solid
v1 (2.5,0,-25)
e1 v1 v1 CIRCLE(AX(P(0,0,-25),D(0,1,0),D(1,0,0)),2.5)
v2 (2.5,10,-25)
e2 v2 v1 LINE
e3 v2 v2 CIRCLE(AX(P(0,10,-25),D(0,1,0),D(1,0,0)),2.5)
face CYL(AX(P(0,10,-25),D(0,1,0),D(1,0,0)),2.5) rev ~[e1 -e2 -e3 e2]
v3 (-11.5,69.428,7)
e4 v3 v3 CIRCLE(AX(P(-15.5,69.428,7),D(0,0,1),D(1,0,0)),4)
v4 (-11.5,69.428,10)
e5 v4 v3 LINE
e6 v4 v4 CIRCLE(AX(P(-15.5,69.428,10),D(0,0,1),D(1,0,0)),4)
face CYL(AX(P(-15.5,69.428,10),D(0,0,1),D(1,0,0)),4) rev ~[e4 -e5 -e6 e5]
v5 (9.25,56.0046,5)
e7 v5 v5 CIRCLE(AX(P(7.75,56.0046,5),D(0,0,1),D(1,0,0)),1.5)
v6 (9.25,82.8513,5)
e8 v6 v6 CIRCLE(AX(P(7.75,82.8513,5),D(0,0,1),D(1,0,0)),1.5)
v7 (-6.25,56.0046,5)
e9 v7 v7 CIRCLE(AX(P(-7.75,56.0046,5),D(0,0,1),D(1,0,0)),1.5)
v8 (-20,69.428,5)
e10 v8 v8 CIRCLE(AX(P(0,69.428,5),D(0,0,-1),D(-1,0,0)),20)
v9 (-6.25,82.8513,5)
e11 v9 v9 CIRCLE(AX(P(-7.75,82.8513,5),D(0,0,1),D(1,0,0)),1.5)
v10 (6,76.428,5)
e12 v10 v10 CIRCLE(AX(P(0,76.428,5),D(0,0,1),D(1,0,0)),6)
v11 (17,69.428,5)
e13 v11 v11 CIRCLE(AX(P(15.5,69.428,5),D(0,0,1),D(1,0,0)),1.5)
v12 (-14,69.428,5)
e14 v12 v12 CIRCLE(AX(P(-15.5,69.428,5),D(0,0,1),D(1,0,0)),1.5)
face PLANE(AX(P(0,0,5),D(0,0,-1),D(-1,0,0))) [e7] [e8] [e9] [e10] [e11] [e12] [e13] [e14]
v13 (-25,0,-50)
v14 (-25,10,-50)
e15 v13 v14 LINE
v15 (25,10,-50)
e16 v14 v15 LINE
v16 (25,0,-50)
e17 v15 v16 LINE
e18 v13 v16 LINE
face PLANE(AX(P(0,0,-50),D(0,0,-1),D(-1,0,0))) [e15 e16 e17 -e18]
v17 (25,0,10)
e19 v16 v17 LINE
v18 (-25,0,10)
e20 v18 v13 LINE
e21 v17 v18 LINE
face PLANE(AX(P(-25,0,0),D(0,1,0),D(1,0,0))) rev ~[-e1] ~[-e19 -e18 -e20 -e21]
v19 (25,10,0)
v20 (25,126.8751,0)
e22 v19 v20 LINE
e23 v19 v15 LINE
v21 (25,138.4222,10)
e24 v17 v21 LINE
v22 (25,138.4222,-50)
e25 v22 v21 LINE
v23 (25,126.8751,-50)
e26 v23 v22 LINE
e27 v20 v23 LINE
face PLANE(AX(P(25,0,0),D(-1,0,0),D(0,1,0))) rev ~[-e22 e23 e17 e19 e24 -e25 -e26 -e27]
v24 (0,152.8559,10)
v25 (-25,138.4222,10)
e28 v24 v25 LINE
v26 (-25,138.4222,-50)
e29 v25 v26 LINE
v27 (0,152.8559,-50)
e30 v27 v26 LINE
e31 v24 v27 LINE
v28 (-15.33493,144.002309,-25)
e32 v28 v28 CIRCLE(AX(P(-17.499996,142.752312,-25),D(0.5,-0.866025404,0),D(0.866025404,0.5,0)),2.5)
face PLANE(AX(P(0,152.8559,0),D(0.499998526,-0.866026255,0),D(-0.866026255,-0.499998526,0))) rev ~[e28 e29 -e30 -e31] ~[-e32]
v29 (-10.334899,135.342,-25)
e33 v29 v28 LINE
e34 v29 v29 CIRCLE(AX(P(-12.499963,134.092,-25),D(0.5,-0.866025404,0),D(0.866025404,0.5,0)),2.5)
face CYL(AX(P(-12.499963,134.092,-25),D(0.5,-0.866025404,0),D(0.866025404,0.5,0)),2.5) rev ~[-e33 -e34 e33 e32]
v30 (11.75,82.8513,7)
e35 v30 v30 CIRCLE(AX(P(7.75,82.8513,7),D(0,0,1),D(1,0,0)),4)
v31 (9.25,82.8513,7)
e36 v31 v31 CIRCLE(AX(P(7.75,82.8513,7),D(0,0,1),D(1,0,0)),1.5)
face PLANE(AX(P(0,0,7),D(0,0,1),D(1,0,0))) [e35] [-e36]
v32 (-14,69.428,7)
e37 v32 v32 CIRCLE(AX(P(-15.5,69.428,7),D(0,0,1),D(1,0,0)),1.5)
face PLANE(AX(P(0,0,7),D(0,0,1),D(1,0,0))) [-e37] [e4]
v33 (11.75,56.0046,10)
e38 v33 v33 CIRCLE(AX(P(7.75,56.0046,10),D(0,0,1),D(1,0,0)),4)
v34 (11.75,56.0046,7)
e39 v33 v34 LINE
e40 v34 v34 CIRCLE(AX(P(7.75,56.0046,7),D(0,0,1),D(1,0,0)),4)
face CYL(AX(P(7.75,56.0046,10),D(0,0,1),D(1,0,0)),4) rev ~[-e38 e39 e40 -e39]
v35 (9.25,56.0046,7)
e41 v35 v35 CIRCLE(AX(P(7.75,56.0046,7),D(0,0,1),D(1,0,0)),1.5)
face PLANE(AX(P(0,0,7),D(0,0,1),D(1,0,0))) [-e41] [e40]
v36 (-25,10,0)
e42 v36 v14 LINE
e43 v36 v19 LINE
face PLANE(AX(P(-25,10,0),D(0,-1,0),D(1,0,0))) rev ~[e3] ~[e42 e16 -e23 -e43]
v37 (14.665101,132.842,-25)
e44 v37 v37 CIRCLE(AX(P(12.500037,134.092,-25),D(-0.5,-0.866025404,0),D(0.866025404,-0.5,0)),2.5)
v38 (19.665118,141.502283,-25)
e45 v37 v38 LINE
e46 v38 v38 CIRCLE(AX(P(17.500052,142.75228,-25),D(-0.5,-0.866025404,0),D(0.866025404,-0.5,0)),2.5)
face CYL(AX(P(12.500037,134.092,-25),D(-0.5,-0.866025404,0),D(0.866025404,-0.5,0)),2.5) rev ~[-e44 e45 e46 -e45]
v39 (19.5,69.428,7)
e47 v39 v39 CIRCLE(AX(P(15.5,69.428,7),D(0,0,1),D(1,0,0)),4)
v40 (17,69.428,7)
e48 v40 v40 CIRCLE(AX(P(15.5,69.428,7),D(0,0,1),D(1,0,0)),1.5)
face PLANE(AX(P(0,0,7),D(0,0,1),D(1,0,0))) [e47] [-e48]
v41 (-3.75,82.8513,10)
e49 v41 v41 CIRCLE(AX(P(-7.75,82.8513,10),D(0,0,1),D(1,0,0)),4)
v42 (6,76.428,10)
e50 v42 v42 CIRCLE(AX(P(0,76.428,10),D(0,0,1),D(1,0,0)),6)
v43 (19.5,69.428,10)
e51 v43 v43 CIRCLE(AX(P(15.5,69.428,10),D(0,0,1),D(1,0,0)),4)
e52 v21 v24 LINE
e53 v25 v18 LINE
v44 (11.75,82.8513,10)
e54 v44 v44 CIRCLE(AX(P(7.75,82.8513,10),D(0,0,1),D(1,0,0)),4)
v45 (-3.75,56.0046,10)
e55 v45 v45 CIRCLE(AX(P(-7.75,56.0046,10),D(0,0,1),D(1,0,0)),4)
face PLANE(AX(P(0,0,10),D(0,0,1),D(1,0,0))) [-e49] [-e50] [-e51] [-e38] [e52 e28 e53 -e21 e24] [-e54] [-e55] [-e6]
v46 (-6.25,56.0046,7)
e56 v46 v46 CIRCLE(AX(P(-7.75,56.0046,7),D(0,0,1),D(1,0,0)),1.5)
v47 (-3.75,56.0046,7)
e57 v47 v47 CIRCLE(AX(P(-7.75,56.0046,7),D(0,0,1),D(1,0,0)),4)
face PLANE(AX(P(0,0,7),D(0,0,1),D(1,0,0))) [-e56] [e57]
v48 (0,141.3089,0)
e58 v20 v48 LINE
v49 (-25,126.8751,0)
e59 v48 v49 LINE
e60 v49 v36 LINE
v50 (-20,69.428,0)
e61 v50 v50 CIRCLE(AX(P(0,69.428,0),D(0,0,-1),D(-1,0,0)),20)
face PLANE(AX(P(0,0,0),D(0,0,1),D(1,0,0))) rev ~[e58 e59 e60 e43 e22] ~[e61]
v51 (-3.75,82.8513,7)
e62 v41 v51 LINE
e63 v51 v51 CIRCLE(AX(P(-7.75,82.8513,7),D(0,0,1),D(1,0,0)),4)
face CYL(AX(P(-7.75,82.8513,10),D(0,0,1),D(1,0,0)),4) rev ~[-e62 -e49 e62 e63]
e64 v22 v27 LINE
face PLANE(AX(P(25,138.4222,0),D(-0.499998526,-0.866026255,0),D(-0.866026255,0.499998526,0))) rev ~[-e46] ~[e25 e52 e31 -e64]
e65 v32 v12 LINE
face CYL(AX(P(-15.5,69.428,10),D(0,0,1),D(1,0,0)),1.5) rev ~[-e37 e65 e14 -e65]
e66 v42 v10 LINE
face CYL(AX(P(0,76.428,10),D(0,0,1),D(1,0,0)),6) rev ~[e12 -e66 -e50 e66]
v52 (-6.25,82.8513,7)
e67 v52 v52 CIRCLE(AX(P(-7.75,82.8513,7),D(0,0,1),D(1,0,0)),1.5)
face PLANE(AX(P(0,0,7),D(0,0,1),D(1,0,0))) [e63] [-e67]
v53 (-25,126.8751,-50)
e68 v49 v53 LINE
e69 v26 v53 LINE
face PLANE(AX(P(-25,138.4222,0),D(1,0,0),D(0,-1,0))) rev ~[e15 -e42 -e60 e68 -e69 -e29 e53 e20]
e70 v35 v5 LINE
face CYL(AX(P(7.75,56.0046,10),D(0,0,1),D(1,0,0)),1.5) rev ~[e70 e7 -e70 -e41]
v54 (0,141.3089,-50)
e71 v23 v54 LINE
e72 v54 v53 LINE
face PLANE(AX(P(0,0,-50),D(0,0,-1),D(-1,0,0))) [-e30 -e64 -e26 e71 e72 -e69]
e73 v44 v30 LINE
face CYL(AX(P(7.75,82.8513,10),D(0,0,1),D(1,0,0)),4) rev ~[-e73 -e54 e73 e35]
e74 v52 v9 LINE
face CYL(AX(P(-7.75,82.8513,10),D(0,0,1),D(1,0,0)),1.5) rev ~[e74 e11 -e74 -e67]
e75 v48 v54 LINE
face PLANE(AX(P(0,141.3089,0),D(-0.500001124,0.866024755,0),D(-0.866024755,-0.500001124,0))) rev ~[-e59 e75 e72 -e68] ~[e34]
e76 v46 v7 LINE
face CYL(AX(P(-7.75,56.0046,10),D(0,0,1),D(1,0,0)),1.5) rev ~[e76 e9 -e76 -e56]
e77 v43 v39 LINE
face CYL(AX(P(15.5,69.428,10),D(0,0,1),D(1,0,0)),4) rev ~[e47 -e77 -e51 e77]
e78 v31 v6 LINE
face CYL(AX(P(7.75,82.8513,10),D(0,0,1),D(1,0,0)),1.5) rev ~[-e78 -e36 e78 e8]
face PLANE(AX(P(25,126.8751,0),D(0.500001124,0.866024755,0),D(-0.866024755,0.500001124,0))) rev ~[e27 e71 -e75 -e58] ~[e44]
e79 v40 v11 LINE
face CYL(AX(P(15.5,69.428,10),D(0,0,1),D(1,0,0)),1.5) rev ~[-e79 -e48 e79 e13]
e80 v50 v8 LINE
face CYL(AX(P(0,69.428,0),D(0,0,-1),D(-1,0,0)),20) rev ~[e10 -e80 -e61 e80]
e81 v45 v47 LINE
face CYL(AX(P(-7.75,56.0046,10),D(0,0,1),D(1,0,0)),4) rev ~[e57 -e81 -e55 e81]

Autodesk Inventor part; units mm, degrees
ref_plane "YZ Plane" through (0, 0, 0) normal (1, 0, 0) x (0, 1, 0)
ref_plane "XZ Plane" through (0, 0, 0) normal (0, 1, 0) x (-1, 0, 0)
ref_plane "XY Plane" through (0, 0, 0) normal (0, 0, 1) x (1, 0, 0)
sketch "Sketch1" plane through (0, 0, 0) normal (0, 0, 1) x (1, 0, 0)
  line L0 (0, 0) -> (0, 152.8559)
  line L1 (0, 152.8559) -> (-25, 138.4222)
  line L2 (-25, 138.4222) -> (-25, 0)
  line L3 (-25, 0) -> (25, 0)
  line L4 (25, 0) -> (25, 138.4222)
  line L5 (25, 138.4222) -> (0, 152.8559)
  dimension "d0" = 152.8559
  dimension "d1" = 60
  dimension "d2" = 60
  dimension "d3" = 50
extrude "Extrusion1" add sketch "Sketch1" along normal blind 10
sketch "Sketch2" plane through (0, 0, 0) normal (0, 0, -1) x (-1, 0, 0)
  line L0 (0, 152.8559) -> (25, 138.4222) projected
  line L1 (-25, 138.4222) -> (0, 152.8559) projected
  line L2 (25, 0) -> (-25, 0) projected
  line L3 (-25, 0) -> (25, 0)
  line L4 (25, 0) -> (25, 10)
  line L5 (25, 10) -> (-25, 10)
  line L6 (-25, 10) -> (-25, 0)
  line L7 (25, 138.4222) -> (25, 0) construction
  line L8 (-25, 0) -> (-25, 138.4222) construction
  line L9 (-25, 126.8751) -> (0, 141.3089)
  line L10 (0, 141.3089) -> (25, 126.8751)
  line L11 (25, 138.4222) -> (25, 0) projected
  line L12 (-25, 126.8751) -> (-25, 138.4222)
  line L13 (0, 152.8559) -> (25, 138.4222) projected
  line L14 (25, 126.8751) -> (25, 138.4222)
  point P0 (0, 0)
  dimension "d6" = 10
  dimension "d7" = 10
extrude "Extrusion2" add sketch "Sketch2" along normal blind 50
sketch "Sketch3" plane through (0, 141.3089, -50) normal (-0.5, -0.8660254, 0) x (0.8660254, -0.5, 0)
  circle A0 centre (14.4338, 25) radius 2.5
  line L0 (28.8675, 50) -> (28.8675, 0) projected
  line L1 (28.8675, 0) -> (0, 0) projected
  point P0 (70.6545, 50)
  point P1 (14.4338, 0)
  point P2 (28.8675, 25)
  dimension "d10" = 5
extrude "Extrusion3" cut sketch "Sketch3" against normal through all
sketch "Sketch4" plane through (-25, 126.8751, -50) normal (0.5, -0.8660254, 0) x (0.8660254, 0.5, 0)
  line L0 (0, 50) -> (0, 0) projected
  line L1 (28.8675, 0) -> (0, 0) projected
  circle A0 centre (14.4338, 25) radius 2.5
  point P0 (-41.7869, 50)
  point P1 (14.4338, 0)
  point P2 (0, 25)
  dimension "d13" = 5
extrude "Extrusion4" cut sketch "Sketch4" against normal through all
sketch "Sketch5" plane through (-25, 10, 0) normal (0, 1, 0) x (1, 0, 0)
  line L0 (0, 0) -> (0, 50) projected
  line L1 (0, 50) -> (50, 50) projected
  circle A0 centre (25, 25) radius 2.5
  point P0 (25, 0)
  point P1 (25, 50)
  point P2 (0, 25)
  dimension "d16" = 5
extrude "Extrusion5" cut sketch "Sketch5" against normal through all
sketch "Sketch6" plane through (0, 0, 10) normal (0, 0, 1) x (1, 0, 0)
  circle A0 centre (0, 76.428) radius 6
  line L0 (-25, 138.4222) -> (0, 152.8559) construction
  line L1 (0, 152.8559) -> (0, 0) construction
  circle A1 centre (0, 69.428) radius 1.5 construction
  circle A2 centre (15.5, 69.428) radius 1.5
  circle A3 centre (7.75, 82.8513) radius 1.5
  circle A4 centre (-7.75, 82.8513) radius 1.5
  circle A5 centre (-15.5, 69.428) radius 1.5
  circle A6 centre (-7.75, 56.0046) radius 1.5
  circle A7 centre (7.75, 56.0046) radius 1.5
  point P0 (0, 76.428)
  dimension "d19" = 12
  dimension "d22" = 3
  dimension "d23" = 7
  dimension "d24" = 3
  dimension "d25" = 15.5
  dimension "d28" = 360
extrude "Extrusion6" cut sketch "Sketch6" against normal through all
sketch "Sketch7" plane through (0, 0, 0) normal (0, 0, -1) x (-1, 0, 0)
  circle A0 centre (-7.75, 56.0046) radius 1.5 projected
  circle A1 centre (15.5, 69.428) radius 1.5 projected
  circle A2 centre (-7.75, 82.8513) radius 1.5 projected
  circle A3 centre (-15.5, 69.428) radius 1.5 projected
  circle A4 centre (7.75, 82.8513) radius 1.5 projected
  circle A5 centre (7.75, 56.0046) radius 1.5 projected
  circle A6 centre (0, 76.428) radius 6 projected
  line L0 (-25, 10) -> (25, 10) projected
  line L1 (25, 126.8751) -> (25, 10) projected
  line L2 (25, 126.8751) -> (0, 141.3089) projected
  line L3 (0, 141.3089) -> (-25, 126.8751) projected
  line L4 (-25, 10) -> (-25, 126.8751) projected
  circle A7 centre (0, 69.428) radius 20
  point P0 (0, 0)
  dimension "d32" = 40
extrude "Extrusion7" cut sketch "Sketch7" against normal blind 5 contours A0 | A1 | A2 | A3 | A4 | A5 | A6 | A7
sketch "Sketch8" plane through (0, 0, 10) normal (0, 0, 1) x (1, 0, 0)
  circle A0 centre (15.5, 69.428) radius 1.5 projected
  circle A1 centre (0, 69.428) radius 1.5
  line L0 (-25, 0) -> (25, 0) projected
  circle A2 centre (15.5, 69.428) radius 4
  circle A3 centre (7.75, 82.8513) radius 4
  circle A4 centre (-7.75, 82.8513) radius 4
  circle A5 centre (-15.5, 69.428) radius 4
  circle A6 centre (-7.75, 56.0046) radius 4
  circle A7 centre (7.75, 56.0046) radius 4
  point P0 (0, 0)
  point P1 (0, 0)
  dimension "d35" = 3
  dimension "d36" = 8
  dimension "d39" = 360
extrude "Extrusion8" cut sketch "Sketch8" against normal blind 3 contours A0 | A2 | A3 | A4 | A5 | A6 | A7
properties part number "BO12" material "ABS Plastic"
